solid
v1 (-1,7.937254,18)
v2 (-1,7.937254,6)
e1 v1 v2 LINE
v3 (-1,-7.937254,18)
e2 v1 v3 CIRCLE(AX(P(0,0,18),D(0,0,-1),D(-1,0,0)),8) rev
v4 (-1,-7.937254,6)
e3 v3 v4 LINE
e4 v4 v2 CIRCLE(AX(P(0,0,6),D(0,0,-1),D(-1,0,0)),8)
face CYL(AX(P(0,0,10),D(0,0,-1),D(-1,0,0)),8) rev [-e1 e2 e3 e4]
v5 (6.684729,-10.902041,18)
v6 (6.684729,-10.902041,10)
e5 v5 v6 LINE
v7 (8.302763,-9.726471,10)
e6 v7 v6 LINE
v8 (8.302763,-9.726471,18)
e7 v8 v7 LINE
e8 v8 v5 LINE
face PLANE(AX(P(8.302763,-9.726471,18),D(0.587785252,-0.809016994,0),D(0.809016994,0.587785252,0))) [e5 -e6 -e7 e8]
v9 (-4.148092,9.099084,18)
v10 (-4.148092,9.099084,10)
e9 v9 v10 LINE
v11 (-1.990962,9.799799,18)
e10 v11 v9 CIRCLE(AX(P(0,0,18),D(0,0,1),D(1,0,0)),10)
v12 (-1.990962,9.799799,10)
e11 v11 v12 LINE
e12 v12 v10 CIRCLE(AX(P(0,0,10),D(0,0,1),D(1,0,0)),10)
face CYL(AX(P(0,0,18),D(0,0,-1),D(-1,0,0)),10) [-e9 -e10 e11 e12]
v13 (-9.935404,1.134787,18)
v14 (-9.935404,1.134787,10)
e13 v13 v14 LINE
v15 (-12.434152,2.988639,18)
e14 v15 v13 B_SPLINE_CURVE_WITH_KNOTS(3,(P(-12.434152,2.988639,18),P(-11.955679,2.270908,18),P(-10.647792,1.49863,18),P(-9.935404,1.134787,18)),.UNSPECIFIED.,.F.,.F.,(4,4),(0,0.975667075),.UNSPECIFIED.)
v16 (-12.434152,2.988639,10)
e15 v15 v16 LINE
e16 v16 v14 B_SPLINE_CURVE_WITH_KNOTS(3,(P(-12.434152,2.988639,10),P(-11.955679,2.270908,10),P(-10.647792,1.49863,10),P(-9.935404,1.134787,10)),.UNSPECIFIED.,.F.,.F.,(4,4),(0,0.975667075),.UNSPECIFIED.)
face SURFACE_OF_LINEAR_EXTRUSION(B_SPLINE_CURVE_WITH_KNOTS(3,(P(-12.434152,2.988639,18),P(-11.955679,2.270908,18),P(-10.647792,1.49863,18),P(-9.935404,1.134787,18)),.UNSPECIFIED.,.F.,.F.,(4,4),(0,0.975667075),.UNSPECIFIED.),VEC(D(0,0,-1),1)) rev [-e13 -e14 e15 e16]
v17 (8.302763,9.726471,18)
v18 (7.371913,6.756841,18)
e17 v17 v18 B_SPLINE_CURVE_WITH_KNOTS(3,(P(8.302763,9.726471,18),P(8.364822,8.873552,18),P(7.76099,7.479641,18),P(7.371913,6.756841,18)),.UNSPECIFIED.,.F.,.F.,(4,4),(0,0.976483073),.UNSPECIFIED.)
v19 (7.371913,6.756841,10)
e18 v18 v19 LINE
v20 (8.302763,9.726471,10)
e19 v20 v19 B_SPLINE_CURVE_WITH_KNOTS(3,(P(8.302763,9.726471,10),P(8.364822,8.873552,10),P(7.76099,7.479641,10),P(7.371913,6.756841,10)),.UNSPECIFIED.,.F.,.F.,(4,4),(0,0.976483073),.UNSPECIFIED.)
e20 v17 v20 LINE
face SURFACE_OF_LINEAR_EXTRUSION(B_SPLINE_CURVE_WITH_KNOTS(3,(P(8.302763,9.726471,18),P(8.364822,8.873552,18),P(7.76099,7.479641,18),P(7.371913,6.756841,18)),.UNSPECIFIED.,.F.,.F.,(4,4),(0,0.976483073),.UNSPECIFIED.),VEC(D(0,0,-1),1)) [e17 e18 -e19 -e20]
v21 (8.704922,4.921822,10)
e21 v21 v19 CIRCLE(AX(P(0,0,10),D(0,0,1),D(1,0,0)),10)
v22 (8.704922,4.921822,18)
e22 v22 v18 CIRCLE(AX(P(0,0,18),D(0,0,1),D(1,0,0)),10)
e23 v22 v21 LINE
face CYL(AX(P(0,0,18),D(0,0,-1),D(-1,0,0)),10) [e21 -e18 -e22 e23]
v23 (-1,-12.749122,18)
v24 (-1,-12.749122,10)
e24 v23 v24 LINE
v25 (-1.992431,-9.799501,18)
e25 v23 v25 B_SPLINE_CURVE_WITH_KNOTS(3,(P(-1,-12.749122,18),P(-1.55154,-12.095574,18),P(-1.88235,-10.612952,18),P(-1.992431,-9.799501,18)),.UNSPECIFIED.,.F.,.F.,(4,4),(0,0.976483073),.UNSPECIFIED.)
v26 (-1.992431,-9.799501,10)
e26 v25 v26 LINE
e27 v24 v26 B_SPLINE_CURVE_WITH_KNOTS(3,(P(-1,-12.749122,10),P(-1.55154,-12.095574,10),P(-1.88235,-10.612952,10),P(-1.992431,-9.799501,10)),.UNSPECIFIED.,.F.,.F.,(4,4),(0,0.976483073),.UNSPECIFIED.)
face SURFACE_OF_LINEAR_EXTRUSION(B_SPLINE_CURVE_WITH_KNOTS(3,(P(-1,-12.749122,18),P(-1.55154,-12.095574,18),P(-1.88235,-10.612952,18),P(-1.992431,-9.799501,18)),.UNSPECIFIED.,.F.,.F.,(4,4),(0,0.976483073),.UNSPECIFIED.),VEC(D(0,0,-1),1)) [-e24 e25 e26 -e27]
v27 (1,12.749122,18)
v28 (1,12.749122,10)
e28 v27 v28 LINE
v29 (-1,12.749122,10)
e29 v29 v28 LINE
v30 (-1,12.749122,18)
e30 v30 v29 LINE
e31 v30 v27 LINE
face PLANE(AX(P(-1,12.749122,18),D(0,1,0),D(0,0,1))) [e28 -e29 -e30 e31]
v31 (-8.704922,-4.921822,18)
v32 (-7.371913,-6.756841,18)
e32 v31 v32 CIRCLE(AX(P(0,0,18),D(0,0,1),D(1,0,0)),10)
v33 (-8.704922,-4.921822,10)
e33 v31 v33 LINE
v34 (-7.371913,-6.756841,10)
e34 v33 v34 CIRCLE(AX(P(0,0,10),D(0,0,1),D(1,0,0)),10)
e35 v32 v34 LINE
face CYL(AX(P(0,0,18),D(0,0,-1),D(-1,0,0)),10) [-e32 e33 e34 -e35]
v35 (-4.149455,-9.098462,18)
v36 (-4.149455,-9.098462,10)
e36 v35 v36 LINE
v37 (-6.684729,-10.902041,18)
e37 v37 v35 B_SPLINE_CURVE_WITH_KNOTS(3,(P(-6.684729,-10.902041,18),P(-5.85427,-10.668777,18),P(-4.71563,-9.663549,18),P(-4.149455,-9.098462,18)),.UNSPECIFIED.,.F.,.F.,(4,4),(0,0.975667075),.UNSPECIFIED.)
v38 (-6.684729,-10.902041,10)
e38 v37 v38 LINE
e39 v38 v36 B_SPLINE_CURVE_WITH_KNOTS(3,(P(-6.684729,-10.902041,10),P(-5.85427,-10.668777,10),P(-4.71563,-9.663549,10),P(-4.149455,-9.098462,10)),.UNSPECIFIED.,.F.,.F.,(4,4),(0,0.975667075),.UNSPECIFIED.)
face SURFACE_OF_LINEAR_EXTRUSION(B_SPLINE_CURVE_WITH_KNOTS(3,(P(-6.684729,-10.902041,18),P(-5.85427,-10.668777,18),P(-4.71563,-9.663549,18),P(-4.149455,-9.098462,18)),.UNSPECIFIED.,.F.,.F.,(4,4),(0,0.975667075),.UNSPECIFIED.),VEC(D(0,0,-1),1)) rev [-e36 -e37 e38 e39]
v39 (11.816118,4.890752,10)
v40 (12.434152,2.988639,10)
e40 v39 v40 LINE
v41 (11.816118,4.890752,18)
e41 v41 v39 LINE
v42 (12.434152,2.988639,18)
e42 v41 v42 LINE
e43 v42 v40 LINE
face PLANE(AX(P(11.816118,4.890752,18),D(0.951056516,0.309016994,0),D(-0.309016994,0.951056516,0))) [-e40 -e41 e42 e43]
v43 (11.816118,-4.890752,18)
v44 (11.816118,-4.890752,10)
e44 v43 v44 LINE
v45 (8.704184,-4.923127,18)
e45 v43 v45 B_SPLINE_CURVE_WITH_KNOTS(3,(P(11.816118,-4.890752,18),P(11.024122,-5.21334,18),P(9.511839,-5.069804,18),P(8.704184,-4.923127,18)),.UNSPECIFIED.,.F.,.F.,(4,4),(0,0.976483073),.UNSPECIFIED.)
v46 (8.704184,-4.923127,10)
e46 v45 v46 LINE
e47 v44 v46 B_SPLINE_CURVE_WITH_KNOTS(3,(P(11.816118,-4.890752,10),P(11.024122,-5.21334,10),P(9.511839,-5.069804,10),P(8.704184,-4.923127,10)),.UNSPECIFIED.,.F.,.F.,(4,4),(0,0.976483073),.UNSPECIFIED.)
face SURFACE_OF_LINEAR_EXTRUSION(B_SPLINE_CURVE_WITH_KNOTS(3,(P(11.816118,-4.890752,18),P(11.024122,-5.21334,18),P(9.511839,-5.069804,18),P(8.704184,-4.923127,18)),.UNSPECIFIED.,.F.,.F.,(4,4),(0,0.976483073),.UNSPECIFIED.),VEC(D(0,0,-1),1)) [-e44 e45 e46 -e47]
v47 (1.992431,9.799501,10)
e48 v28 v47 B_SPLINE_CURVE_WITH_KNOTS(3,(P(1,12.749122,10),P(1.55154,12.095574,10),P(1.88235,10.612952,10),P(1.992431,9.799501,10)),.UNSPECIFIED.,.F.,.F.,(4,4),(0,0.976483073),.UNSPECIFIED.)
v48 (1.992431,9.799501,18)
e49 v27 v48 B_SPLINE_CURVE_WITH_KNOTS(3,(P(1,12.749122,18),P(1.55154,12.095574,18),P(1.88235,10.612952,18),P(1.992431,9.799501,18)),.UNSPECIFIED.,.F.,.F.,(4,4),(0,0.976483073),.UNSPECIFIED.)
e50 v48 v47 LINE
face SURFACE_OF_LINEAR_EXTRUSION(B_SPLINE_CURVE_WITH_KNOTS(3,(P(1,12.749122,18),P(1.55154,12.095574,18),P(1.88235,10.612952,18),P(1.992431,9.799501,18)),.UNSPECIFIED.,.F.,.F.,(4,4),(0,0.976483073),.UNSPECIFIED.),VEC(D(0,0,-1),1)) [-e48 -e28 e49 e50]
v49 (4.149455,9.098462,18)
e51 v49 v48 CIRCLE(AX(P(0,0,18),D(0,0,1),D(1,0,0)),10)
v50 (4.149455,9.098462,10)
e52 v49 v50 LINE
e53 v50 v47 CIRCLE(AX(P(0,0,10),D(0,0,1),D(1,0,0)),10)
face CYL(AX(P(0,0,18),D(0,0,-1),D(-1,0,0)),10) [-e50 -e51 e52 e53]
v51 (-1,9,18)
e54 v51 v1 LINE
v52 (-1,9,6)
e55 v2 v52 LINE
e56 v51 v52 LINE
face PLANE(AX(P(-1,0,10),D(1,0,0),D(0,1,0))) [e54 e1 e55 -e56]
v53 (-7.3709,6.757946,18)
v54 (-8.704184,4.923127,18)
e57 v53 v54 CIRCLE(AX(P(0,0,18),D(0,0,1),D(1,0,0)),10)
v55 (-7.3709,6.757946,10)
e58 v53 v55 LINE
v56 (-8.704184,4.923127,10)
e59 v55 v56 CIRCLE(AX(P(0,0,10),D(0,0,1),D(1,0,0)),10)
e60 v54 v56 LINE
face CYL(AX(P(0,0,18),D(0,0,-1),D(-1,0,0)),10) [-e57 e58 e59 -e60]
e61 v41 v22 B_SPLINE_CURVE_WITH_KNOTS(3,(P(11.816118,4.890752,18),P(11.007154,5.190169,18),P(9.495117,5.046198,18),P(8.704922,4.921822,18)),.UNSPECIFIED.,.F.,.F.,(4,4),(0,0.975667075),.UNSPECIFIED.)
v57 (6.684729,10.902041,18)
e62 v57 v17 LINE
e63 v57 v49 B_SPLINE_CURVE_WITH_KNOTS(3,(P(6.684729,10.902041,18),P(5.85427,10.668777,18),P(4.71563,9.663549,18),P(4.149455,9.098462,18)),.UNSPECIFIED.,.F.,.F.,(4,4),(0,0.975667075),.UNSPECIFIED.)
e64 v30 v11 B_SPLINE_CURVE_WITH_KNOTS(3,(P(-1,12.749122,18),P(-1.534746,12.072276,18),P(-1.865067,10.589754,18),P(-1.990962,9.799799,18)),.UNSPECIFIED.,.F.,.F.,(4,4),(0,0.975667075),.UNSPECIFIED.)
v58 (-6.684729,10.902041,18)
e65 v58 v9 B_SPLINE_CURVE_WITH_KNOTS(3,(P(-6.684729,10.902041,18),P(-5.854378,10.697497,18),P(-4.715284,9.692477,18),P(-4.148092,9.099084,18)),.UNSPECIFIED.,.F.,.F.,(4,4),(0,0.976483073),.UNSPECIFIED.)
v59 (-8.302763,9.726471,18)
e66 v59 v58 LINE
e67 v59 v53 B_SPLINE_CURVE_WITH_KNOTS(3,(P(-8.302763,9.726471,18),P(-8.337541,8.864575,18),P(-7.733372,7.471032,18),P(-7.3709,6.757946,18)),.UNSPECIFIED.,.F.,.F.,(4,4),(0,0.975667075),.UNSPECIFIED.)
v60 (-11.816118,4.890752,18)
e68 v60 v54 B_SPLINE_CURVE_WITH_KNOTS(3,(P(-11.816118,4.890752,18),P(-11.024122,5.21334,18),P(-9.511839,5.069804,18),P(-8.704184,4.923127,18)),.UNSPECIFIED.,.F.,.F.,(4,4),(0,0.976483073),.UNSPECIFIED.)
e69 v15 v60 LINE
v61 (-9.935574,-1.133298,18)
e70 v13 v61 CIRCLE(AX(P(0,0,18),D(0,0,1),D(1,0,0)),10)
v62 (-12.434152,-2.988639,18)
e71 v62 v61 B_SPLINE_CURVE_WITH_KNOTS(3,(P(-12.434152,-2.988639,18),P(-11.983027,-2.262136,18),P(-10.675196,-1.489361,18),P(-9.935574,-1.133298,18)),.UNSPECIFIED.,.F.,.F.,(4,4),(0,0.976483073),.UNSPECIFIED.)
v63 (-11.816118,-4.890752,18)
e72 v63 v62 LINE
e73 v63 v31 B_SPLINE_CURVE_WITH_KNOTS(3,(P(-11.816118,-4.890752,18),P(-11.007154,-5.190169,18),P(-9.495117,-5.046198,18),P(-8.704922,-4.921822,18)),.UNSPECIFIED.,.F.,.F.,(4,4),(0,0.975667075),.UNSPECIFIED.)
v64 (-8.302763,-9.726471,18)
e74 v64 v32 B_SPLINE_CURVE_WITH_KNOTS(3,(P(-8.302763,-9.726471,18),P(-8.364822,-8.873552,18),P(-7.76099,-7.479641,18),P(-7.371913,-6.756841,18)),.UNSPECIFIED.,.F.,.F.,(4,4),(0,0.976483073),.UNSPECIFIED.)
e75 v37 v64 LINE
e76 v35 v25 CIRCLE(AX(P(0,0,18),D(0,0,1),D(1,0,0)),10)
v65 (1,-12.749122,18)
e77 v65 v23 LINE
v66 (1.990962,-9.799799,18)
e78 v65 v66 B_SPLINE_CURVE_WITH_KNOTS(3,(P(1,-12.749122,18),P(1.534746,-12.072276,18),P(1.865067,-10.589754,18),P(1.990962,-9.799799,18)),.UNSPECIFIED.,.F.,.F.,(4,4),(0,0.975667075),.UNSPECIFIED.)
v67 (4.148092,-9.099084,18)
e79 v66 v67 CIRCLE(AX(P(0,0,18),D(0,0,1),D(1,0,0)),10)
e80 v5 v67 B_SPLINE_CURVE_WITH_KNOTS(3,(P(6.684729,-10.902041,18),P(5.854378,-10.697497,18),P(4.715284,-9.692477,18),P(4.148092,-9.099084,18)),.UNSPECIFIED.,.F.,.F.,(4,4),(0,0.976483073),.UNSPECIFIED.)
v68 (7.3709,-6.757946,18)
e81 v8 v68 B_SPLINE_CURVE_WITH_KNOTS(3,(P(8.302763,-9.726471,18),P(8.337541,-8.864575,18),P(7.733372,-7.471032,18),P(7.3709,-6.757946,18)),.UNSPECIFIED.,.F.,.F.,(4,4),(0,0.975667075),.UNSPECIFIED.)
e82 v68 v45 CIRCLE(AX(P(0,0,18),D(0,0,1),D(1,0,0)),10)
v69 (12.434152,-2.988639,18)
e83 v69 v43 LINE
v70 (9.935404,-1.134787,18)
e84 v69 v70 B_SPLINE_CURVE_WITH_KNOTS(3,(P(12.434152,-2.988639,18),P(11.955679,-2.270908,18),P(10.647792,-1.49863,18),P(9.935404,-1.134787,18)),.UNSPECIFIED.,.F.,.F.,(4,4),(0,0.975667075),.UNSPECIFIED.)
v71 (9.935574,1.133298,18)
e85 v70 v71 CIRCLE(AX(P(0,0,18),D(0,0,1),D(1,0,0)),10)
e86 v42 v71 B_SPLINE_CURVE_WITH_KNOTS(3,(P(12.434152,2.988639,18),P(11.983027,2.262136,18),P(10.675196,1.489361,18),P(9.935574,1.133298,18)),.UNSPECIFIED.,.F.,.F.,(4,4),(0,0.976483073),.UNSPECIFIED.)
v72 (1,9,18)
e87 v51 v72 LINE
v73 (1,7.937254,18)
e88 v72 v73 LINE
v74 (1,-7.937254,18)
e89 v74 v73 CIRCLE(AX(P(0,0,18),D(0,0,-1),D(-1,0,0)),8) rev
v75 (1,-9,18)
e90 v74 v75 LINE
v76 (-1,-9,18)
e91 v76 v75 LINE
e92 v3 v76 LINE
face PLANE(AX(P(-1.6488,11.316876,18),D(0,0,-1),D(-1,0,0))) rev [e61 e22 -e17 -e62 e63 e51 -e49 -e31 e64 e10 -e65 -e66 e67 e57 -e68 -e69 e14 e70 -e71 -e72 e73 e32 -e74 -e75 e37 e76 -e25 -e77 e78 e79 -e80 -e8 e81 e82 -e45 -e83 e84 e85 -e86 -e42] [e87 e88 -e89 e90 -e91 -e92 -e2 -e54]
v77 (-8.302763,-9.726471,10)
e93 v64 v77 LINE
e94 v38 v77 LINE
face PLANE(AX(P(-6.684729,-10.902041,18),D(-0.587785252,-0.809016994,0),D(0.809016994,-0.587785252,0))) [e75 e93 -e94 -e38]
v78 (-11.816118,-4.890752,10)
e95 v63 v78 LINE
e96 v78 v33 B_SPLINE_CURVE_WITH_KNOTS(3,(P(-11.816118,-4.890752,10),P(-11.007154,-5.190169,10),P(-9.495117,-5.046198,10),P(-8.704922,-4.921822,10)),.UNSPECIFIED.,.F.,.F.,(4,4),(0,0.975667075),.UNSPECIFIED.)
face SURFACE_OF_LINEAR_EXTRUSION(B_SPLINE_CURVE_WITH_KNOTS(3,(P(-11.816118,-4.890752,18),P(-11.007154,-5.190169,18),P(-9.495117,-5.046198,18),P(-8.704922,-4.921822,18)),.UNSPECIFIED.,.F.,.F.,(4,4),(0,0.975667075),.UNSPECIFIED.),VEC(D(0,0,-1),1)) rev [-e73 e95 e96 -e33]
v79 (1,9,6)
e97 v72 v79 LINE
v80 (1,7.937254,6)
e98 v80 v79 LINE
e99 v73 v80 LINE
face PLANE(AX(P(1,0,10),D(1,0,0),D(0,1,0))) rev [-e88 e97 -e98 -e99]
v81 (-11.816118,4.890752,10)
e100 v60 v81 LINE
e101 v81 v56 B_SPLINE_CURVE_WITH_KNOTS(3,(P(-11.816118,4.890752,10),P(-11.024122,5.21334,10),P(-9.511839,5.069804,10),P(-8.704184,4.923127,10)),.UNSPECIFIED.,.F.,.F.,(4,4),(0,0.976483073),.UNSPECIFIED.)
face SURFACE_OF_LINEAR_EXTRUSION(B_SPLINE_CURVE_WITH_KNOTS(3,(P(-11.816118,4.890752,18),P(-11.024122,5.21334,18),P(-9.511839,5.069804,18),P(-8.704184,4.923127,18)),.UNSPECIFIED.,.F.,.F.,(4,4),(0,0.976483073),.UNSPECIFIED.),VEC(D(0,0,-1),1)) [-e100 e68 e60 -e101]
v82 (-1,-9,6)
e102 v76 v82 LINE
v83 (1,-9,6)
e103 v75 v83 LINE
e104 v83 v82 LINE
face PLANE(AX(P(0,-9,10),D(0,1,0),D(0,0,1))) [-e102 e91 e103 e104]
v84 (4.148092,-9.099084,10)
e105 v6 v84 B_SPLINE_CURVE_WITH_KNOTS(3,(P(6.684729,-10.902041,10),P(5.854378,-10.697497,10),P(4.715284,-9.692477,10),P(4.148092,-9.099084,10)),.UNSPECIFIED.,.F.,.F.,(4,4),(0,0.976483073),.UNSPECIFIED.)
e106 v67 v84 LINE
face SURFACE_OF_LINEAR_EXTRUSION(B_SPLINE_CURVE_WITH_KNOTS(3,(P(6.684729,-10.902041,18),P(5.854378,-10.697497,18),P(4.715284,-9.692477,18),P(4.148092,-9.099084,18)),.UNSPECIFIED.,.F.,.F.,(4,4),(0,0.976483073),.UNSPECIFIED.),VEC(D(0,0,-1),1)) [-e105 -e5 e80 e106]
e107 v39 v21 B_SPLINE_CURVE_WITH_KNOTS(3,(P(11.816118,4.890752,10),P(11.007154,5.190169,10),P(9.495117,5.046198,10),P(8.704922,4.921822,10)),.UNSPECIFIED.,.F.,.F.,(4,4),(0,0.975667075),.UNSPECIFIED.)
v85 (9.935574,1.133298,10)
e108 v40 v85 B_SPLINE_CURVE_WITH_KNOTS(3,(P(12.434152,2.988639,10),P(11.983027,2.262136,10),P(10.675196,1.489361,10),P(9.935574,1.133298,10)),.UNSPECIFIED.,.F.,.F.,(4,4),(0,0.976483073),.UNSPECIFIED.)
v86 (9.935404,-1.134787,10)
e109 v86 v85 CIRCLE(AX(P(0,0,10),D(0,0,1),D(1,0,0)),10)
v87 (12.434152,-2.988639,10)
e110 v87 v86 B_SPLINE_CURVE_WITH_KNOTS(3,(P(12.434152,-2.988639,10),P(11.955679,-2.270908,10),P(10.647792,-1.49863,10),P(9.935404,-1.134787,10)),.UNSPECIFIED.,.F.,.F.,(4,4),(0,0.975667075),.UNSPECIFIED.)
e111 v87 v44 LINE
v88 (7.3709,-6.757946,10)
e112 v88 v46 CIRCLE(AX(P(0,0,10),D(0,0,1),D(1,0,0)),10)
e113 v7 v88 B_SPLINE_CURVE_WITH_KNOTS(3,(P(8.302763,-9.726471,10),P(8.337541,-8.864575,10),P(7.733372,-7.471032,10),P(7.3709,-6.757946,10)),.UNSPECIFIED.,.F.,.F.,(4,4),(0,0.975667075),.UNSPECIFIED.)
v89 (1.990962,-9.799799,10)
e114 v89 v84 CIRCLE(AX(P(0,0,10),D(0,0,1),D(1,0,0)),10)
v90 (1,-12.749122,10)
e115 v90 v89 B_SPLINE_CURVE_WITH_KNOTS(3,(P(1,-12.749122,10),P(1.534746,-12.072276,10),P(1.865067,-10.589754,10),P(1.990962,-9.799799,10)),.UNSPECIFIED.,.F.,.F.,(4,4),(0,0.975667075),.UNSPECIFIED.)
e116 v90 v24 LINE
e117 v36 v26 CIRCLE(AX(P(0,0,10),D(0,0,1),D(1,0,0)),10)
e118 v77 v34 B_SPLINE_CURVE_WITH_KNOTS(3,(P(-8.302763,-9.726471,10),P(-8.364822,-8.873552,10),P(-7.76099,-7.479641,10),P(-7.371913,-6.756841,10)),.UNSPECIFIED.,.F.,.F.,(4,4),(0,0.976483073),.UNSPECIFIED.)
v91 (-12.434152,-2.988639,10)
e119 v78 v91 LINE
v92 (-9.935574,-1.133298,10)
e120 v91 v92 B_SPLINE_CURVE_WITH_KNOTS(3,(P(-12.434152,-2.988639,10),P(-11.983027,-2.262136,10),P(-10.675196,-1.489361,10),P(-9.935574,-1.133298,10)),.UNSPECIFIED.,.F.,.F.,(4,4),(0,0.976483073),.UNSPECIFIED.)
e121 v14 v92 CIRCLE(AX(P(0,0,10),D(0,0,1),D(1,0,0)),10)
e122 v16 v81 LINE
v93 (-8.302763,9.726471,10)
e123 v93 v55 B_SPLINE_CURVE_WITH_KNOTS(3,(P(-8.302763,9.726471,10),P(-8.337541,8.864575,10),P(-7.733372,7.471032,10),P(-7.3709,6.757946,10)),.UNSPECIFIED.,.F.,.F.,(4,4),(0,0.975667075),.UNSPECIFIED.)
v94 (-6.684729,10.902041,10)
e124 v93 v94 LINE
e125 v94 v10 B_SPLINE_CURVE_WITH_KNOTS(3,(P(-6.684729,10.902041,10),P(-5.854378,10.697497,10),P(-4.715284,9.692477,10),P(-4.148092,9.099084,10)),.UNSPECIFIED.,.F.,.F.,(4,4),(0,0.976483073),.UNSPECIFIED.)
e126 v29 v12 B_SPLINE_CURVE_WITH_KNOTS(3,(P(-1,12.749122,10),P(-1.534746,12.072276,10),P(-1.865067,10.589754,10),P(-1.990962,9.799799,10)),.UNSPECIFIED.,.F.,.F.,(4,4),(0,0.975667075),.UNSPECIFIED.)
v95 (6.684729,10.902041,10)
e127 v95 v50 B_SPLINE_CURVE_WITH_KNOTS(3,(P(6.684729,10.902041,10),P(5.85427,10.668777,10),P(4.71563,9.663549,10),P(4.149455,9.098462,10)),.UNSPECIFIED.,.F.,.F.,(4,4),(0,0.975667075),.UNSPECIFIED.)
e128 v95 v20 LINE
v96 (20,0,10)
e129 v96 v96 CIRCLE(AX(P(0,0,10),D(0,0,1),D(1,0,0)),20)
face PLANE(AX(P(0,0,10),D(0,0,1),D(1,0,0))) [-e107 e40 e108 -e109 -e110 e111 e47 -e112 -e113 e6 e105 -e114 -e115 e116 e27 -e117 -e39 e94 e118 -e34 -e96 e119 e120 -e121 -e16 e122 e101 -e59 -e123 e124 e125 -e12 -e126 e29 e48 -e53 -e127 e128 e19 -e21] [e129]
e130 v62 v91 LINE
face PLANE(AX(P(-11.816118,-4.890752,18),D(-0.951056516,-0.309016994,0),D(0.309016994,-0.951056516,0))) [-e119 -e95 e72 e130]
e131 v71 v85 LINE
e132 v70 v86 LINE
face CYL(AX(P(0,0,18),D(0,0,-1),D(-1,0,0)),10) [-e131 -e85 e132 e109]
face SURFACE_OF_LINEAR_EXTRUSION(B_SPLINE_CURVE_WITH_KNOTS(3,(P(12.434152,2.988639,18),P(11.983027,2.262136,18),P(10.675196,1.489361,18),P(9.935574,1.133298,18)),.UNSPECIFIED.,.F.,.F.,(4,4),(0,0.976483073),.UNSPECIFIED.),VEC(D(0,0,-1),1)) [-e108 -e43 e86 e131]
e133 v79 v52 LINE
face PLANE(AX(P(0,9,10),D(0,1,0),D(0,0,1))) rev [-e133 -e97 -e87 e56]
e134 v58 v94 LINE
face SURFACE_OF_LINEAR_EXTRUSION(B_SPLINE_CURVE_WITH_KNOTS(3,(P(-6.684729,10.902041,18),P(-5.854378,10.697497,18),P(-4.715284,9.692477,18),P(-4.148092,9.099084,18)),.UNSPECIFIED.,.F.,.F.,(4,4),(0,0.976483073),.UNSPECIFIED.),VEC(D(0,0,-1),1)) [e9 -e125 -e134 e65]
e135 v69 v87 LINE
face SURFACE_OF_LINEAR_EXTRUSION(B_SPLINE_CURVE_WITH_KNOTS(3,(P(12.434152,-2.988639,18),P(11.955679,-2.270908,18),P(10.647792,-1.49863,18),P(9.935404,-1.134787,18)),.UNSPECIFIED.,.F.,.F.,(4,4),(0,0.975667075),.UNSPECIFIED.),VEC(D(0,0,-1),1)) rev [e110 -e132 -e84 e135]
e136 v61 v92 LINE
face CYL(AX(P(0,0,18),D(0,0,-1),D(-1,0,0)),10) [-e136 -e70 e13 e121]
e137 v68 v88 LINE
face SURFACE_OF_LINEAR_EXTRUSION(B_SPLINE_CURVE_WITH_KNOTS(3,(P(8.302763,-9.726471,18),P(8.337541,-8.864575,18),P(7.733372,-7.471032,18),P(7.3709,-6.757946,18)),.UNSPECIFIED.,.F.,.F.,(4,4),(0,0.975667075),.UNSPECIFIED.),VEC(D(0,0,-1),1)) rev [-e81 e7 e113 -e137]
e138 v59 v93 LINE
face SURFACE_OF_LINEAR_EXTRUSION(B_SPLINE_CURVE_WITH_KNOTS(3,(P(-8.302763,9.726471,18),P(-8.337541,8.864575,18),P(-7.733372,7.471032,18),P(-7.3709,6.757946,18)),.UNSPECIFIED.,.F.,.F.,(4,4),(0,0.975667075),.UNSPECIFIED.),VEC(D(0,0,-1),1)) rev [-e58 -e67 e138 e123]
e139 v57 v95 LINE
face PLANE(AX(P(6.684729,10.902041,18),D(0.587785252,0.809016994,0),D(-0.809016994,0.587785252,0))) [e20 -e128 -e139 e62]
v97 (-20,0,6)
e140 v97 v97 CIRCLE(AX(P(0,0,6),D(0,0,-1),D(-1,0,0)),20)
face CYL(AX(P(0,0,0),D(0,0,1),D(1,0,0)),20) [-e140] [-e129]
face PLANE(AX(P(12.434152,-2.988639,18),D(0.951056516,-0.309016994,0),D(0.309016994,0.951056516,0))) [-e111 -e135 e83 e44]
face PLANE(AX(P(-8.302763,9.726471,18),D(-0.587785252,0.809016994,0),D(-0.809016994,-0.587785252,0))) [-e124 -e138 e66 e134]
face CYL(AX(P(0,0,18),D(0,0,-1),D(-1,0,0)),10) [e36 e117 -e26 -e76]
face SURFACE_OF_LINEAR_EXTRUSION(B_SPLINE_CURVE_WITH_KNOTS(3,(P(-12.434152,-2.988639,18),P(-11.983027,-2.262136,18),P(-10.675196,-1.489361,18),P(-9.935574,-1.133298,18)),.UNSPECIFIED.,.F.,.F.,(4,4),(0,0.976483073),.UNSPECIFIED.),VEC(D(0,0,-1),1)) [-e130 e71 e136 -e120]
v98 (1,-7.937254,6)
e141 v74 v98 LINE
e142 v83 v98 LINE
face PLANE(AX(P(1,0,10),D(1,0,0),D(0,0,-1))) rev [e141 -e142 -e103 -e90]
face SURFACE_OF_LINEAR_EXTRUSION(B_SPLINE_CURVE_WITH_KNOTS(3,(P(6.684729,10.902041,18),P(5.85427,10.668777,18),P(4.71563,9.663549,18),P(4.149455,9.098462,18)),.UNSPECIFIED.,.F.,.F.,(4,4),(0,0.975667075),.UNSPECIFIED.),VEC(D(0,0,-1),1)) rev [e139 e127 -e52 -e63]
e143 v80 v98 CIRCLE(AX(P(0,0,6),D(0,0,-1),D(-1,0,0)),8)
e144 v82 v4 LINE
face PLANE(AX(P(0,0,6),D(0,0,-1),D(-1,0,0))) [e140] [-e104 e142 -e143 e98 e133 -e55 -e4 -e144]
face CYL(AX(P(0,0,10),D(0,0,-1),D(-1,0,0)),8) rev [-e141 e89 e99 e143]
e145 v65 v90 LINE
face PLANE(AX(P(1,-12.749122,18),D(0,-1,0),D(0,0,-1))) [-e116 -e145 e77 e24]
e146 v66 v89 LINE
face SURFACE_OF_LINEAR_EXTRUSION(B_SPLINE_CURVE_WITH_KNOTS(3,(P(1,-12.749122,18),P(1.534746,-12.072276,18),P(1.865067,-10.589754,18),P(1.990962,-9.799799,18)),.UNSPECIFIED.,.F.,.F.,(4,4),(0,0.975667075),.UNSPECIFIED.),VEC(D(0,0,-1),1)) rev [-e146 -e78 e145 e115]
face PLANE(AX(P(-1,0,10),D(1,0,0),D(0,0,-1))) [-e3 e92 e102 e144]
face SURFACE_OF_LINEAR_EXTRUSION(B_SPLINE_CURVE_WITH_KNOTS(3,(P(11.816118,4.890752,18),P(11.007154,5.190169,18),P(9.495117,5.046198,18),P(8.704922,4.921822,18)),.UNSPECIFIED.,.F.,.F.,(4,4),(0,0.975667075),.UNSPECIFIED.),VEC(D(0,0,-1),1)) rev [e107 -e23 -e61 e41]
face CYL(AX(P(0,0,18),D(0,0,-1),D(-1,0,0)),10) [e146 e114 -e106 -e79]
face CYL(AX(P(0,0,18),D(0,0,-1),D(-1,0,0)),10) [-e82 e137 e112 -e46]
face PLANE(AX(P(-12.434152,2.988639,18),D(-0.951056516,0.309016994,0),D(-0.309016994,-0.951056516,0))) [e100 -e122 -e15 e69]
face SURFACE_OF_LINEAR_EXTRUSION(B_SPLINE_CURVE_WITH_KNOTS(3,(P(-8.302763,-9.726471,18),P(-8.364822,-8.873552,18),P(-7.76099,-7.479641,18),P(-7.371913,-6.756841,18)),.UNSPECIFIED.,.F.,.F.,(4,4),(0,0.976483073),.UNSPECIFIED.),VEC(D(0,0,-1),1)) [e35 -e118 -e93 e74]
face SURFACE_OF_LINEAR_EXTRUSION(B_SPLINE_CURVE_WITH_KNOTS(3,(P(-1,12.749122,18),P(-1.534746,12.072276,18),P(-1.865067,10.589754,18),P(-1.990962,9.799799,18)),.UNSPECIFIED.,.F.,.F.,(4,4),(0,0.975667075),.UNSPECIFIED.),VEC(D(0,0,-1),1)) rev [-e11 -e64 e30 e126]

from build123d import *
from build123d.topology import SkipClean

# Parameters (mm, degrees)
SKETCH1_R           = 30
BOSS_EXTRUDE1_DEPTH = 10
BOSS_EXTRUDE2_DEPTH = 10
CIRPATTERN1_DEPTH   = 10
BOSS_EXTRUDE4_DEPTH = 8
CIRPATTERN2_COUNT   = 10
SKETCH3_R           = 34.614850266
SKETCH3_R_2         = 20
CUT_EXTRUDE1_DEPTH  = 10
CUT_EXTRUDE2_DEPTH  = 21
CUT_EXTRUDE3_START  = -6
SKETCH4_R           = 20
CUT_EXTRUDE3_DEPTH  = 6


# Read off the part's stored shape, not the designer's step: CirPattern1
with BuildPart() as part:
    # Sketch1 → Boss-Extrude1 (new body)
    with BuildSketch(Plane.XY):
        Circle(SKETCH1_R)
        with BuildLine():
            ThreePointArc((1, -7.937253933), (8, 0), (1, 7.937253933))
            Line((1, 7.937253933), (1, 9))
            Line((1, 9), (-1, 9))
            Line((-1, 9), (-1, 7.937253933))
            ThreePointArc((-1, 7.937253933), (-8, 0), (-1, -7.937253933))
            Line((-1, -7.937253933), (-1, -9))
            Line((-1, -9), (1, -9))
            Line((1, -9), (1, -7.937253933))
        make_face(mode=Mode.SUBTRACT)
    extrude(amount=BOSS_EXTRUDE1_DEPTH)

    # Sketch1<3> → Boss-Extrude2 (add)
    with BuildSketch(Plane.XY):
        with BuildLine():
            ThreePointArc((1.012083684, 33.98493323), (0.506097745, 33.996233101), (-3.37e-07, 34))
            ThreePointArc((-3.37e-07, 34), (-0.505863732, 33.996236584), (-1.011615139, 33.98494718))
            add(Edge.make_bspline(
                [(-1.011615139, 33.98494718), (-1.855460387, 32.888056738), (-2.349185813, 31.525158942), (-2.492791418, 29.896253795)],
                knots=[0.00448065, 0.00448065, 0.00448065, 0.00448065, 0.982900103, 0.982900103, 0.982900103, 0.982900103], degree=3))
            ThreePointArc((-2.492791418, 29.896253795), (0.004835323, 29.99999961), (2.502428492, 29.895448678))
            add(Edge.make_bspline(
                [(1.012083684, 33.98493323), (2.036760796, 32.704388911), (2.533542399, 31.341227394), (2.502428492, 29.895448678)],
                knots=[0.003833031, 0.003833031, 0.003833031, 0.003833031, 0.980908423, 0.980908423, 0.980908423, 0.980908423], degree=3))
        make_face()
    extrude(amount=BOSS_EXTRUDE2_DEPTH)

    # CirPattern1 outline → CirPattern1 (add)
    with BuildSketch(Plane.XY):
        with BuildLine():
            ThreePointArc((9.773545735, 32.564978178), (8.800073923, 32.841417432), (7.818806388, 33.08876345))
            add(Edge.make_bspline(
                [(7.818806388, 33.08876345), (6.719818333, 32.247651865), (5.890172287, 31.058979229), (5.329868249, 29.522745544)],
                knots=[0.00448065, 0.00448065, 0.00448065, 0.00448065, 0.982900103, 0.982900103, 0.982900103, 0.982900103], degree=3))
            ThreePointArc((5.329868249, 29.522745544), (7.769241816, 28.976522939), (10.154671788, 28.229109814))
            add(Edge.make_bspline(
                [(9.773545735, 32.564978178), (10.431878564, 31.062861398), (10.558920581, 29.617571943), (10.154671788, 28.229109814)],
                knots=[0.003833031, 0.003833031, 0.003833031, 0.003833031, 0.980908423, 0.980908423, 0.980908423, 0.980908423], degree=3))
        make_face()
        with BuildLine():
            add(Edge.make_bspline(
                [(-9.773096766, 32.565112922), (-10.304292547, 31.287194894), (-10.428450782, 29.842951172), (-10.145571469, 28.232381755)],
                knots=[0.00448065, 0.00448065, 0.00448065, 0.00448065, 0.982900103, 0.982900103, 0.982900103, 0.982900103], degree=3))
            ThreePointArc((-10.145571469, 28.232381755), (-7.759900689, 28.979025887), (-5.320351171, 29.52446212))
            add(Edge.make_bspline(
                [(-7.818350197, 33.088871244), (-6.497158854, 32.117166366), (-5.664492512, 30.929029992), (-5.320351171, 29.52446212)],
                knots=[0.003833031, 0.003833031, 0.003833031, 0.003833031, 0.980908423, 0.980908423, 0.980908423, 0.980908423], degree=3))
            ThreePointArc((-7.818350197, 33.088871244), (-8.799621143, 32.841538754), (-9.773096766, 32.565112922))
        make_face()
        with BuildLine():
            add(Edge.make_bspline(
                [(-17.868557999, 28.926020034), (-18.050904199, 27.554162422), (-17.797034063, 26.126995596), (-17.106947591, 24.644519555)],
                knots=[0.00448065, 0.00448065, 0.00448065, 0.00448065, 0.982900103, 0.982900103, 0.982900103, 0.982900103], degree=3))
            ThreePointArc((-17.106947591, 24.644519555), (-14.995812293, 25.983179438), (-12.780557694, 27.141432259))
            add(Edge.make_bspline(
                [(-16.115976433, 29.937857365), (-14.588307865, 29.34121201), (-13.476501618, 28.409070308), (-12.780557694, 27.141432259)],
                knots=[0.003833031, 0.003833031, 0.003833031, 0.003833031, 0.980908423, 0.980908423, 0.980908423, 0.980908423], degree=3))
            ThreePointArc((-16.115976433, 29.937857365), (-16.999797024, 29.444980916), (-17.868557999, 28.926020034))
        make_face()
        with BuildLine():
            add(Edge.make_bspline(
                [(-24.746306534, 23.315666684), (-24.567376561, 21.943359317), (-23.952778885, 20.630528448), (-22.902513506, 19.377174075)],
                knots=[0.00448065, 0.00448065, 0.00448065, 0.00448065, 0.982900103, 0.982900103, 0.982900103, 0.982900103], degree=3))
            ThreePointArc((-22.902513506, 19.377174075), (-21.209784071, 21.216622251), (-19.369790332, 22.908758643))
            add(Edge.make_bspline(
                [(-23.315325509, 24.746627981), (-21.685287803, 24.565702544), (-20.37010941, 23.953079431), (-19.369790332, 22.908758643)],
                knots=[0.003833031, 0.003833031, 0.003833031, 0.003833031, 0.980908423, 0.980908423, 0.980908423, 0.980908423], degree=3))
            ThreePointArc((-23.315325509, 24.746627981), (-24.041464831, 24.041796289), (-24.746306534, 23.315666684))
        make_face()
        with BuildLine():
            add(Edge.make_bspline(
                [(-29.937635174, 16.11638918), (-29.409622809, 14.837152538), (-28.476181409, 13.728124879), (-27.137310973, 12.789306203)],
                knots=[0.00448065, 0.00448065, 0.00448065, 0.00448065, 0.982900103, 0.982900103, 0.982900103, 0.982900103], degree=3))
            ThreePointArc((-27.137310973, 12.789306203), (-25.978344116, 15.004187319), (-24.639003768, 17.114890984))
            add(Edge.make_bspline(
                [(-28.925773681, 17.868956796), (-27.304451214, 18.116081046), (-25.875527909, 17.864725776), (-24.639003768, 17.114890984)],
                knots=[0.003833031, 0.003833031, 0.003833031, 0.003833031, 0.980908423, 0.980908423, 0.980908423, 0.980908423], degree=3))
            ThreePointArc((-28.925773681, 17.868956796), (-29.44474654, 17.000202975), (-29.937635174, 16.11638918))
        make_face()
        with BuildLine():
            add(Edge.make_bspline(
                [(-33.08876345, 7.818806388), (-32.247651865, 6.719818333), (-31.058979229, 5.890172287), (-29.522745544, 5.329868249)],
                knots=[0.00448065, 0.00448065, 0.00448065, 0.00448065, 0.982900103, 0.982900103, 0.982900103, 0.982900103], degree=3))
            ThreePointArc((-29.522745544, 5.329868249), (-28.97652294, 7.769241816), (-28.229109815, 10.154671789))
            add(Edge.make_bspline(
                [(-32.564978178, 9.773545735), (-31.062861398, 10.431878564), (-29.617571943, 10.558920581), (-28.229109815, 10.154671789)],
                knots=[0.003833031, 0.003833031, 0.003833031, 0.003833031, 0.980908423, 0.980908423, 0.980908423, 0.980908423], degree=3))
            ThreePointArc((-32.564978178, 9.773545735), (-32.841417432, 8.800073923), (-33.08876345, 7.818806388))
        make_face()
        with BuildLine():
            add(Edge.make_bspline(
                [(-33.98494718, -1.011615139), (-32.888056738, -1.855460387), (-31.525158942, -2.349185813), (-29.896253795, -2.492791418)],
                knots=[0.00448065, 0.00448065, 0.00448065, 0.00448065, 0.982900103, 0.982900103, 0.982900103, 0.982900103], degree=3))
            ThreePointArc((-29.896253795, -2.492791418), (-29.999999612, 0.004835323), (-29.895448679, 2.502428492))
            add(Edge.make_bspline(
                [(-33.98493323, 1.012083684), (-32.704388911, 2.036760796), (-31.341227394, 2.533542399), (-29.895448679, 2.502428492)],
                knots=[0.003833031, 0.003833031, 0.003833031, 0.003833031, 0.980908423, 0.980908423, 0.980908423, 0.980908423], degree=3))
            ThreePointArc((-33.98493323, 1.012083684), (-33.999999999, 0.000234376), (-33.98494718, -1.011615139))
        make_face()
        with BuildLine():
            add(Edge.make_bspline(
                [(-32.565112922, -9.773096766), (-31.287194894, -10.304292547), (-29.842951172, -10.428450782), (-28.232381755, -10.145571469)],
                knots=[0.00448065, 0.00448065, 0.00448065, 0.00448065, 0.982900103, 0.982900103, 0.982900103, 0.982900103], degree=3))
            ThreePointArc((-28.232381755, -10.145571469), (-28.979025887, -7.759900689), (-29.52446212, -5.320351171))
            add(Edge.make_bspline(
                [(-33.088871244, -7.818350197), (-32.117166366, -6.497158854), (-30.929029992, -5.664492512), (-29.52446212, -5.320351171)],
                knots=[0.003833031, 0.003833031, 0.003833031, 0.003833031, 0.980908423, 0.980908423, 0.980908423, 0.980908423], degree=3))
            ThreePointArc((-33.088871244, -7.818350197), (-32.841538754, -8.799621143), (-32.565112922, -9.773096766))
        make_face()
        with BuildLine():
            add(Edge.make_bspline(
                [(-28.926020034, -17.868557999), (-27.554162422, -18.050904199), (-26.126995596, -17.797034063), (-24.644519555, -17.106947591)],
                knots=[0.00448065, 0.00448065, 0.00448065, 0.00448065, 0.982900103, 0.982900103, 0.982900103, 0.982900103], degree=3))
            ThreePointArc((-24.644519555, -17.106947591), (-25.983179438, -14.995812293), (-27.141432259, -12.780557694))
            add(Edge.make_bspline(
                [(-29.937857365, -16.115976433), (-29.34121201, -14.588307865), (-28.409070308, -13.476501618), (-27.141432259, -12.780557694)],
                knots=[0.003833031, 0.003833031, 0.003833031, 0.003833031, 0.980908423, 0.980908423, 0.980908423, 0.980908423], degree=3))
            ThreePointArc((-29.937857365, -16.115976433), (-29.444980916, -16.999797024), (-28.926020034, -17.868557999))
        make_face()
        with BuildLine():
            add(Edge.make_bspline(
                [(-23.315666684, -24.746306534), (-21.943359317, -24.567376561), (-20.630528448, -23.952778885), (-19.377174075, -22.902513506)],
                knots=[0.00448065, 0.00448065, 0.00448065, 0.00448065, 0.982900103, 0.982900103, 0.982900103, 0.982900103], degree=3))
            ThreePointArc((-19.377174075, -22.902513506), (-21.21662225, -21.209784071), (-22.908758643, -19.369790331))
            add(Edge.make_bspline(
                [(-24.746627981, -23.315325509), (-24.565702544, -21.685287803), (-23.953079431, -20.37010941), (-22.908758643, -19.369790331)],
                knots=[0.003833031, 0.003833031, 0.003833031, 0.003833031, 0.980908423, 0.980908423, 0.980908423, 0.980908423], degree=3))
            ThreePointArc((-24.746627981, -23.315325509), (-24.041796289, -24.041464831), (-23.315666684, -24.746306534))
        make_face()
        with BuildLine():
            add(Edge.make_bspline(
                [(-16.11638918, -29.937635174), (-14.837152538, -29.409622809), (-13.728124879, -28.476181409), (-12.789306203, -27.137310973)],
                knots=[0.00448065, 0.00448065, 0.00448065, 0.00448065, 0.982900103, 0.982900103, 0.982900103, 0.982900103], degree=3))
            ThreePointArc((-12.789306203, -27.137310973), (-15.004187318, -25.978344115), (-17.114890984, -24.639003767))
            add(Edge.make_bspline(
                [(-17.868956796, -28.925773681), (-18.116081046, -27.304451214), (-17.864725776, -25.875527909), (-17.114890984, -24.639003767)],
                knots=[0.003833031, 0.003833031, 0.003833031, 0.003833031, 0.980908423, 0.980908423, 0.980908423, 0.980908423], degree=3))
            ThreePointArc((-17.868956796, -28.925773681), (-17.000202975, -29.44474654), (-16.11638918, -29.937635174))
        make_face()
        with BuildLine():
            add(Edge.make_bspline(
                [(-7.818806388, -33.08876345), (-6.719818333, -32.247651865), (-5.890172287, -31.058979229), (-5.329868249, -29.522745544)],
                knots=[0.00448065, 0.00448065, 0.00448065, 0.00448065, 0.982900103, 0.982900103, 0.982900103, 0.982900103], degree=3))
            ThreePointArc((-5.329868249, -29.522745544), (-7.769241816, -28.976522939), (-10.154671788, -28.229109814))
            add(Edge.make_bspline(
                [(-9.773545735, -32.564978178), (-10.431878564, -31.062861398), (-10.558920581, -29.617571943), (-10.154671788, -28.229109814)],
                knots=[0.003833031, 0.003833031, 0.003833031, 0.003833031, 0.980908423, 0.980908423, 0.980908423, 0.980908423], degree=3))
            ThreePointArc((-9.773545735, -32.564978178), (-8.800073923, -32.841417432), (-7.818806388, -33.08876345))
        make_face()
        with BuildLine():
            add(Edge.make_bspline(
                [(1.011615139, -33.98494718), (1.855460387, -32.888056738), (2.349185813, -31.525158942), (2.492791418, -29.896253795)],
                knots=[0.00448065, 0.00448065, 0.00448065, 0.00448065, 0.982900103, 0.982900103, 0.982900103, 0.982900103], degree=3))
            ThreePointArc((2.492791418, -29.896253795), (-0.004835323, -29.99999961), (-2.502428492, -29.895448678))
            add(Edge.make_bspline(
                [(-1.012083684, -33.98493323), (-2.036760796, -32.704388911), (-2.533542399, -31.341227394), (-2.502428492, -29.895448678)],
                knots=[0.003833031, 0.003833031, 0.003833031, 0.003833031, 0.980908423, 0.980908423, 0.980908423, 0.980908423], degree=3))
            ThreePointArc((-1.012083684, -33.98493323), (-0.000234376, -33.999999999), (1.011615139, -33.98494718))
        make_face()
        with BuildLine():
            add(Edge.make_bspline(
                [(9.773096766, -32.565112922), (10.304292547, -31.287194894), (10.428450782, -29.842951172), (10.145571469, -28.232381755)],
                knots=[0.00448065, 0.00448065, 0.00448065, 0.00448065, 0.982900103, 0.982900103, 0.982900103, 0.982900103], degree=3))
            ThreePointArc((10.145571469, -28.232381755), (7.759900689, -28.979025885), (5.320351171, -29.524462118))
            add(Edge.make_bspline(
                [(7.818350197, -33.088871244), (6.497158854, -32.117166366), (5.664492512, -30.929029992), (5.320351171, -29.524462118)],
                knots=[0.003833031, 0.003833031, 0.003833031, 0.003833031, 0.980908423, 0.980908423, 0.980908423, 0.980908423], degree=3))
            ThreePointArc((7.818350197, -33.088871244), (8.799621143, -32.841538754), (9.773096766, -32.565112922))
        make_face()
        with BuildLine():
            add(Edge.make_bspline(
                [(17.868557999, -28.926020034), (18.050904199, -27.554162422), (17.797034063, -26.126995596), (17.106947591, -24.644519555)],
                knots=[0.00448065, 0.00448065, 0.00448065, 0.00448065, 0.982900103, 0.982900103, 0.982900103, 0.982900103], degree=3))
            ThreePointArc((17.106947591, -24.644519555), (14.995812292, -25.983179437), (12.780557694, -27.141432258))
            add(Edge.make_bspline(
                [(16.115976433, -29.937857365), (14.588307865, -29.34121201), (13.476501618, -28.409070308), (12.780557694, -27.141432258)],
                knots=[0.003833031, 0.003833031, 0.003833031, 0.003833031, 0.980908423, 0.980908423, 0.980908423, 0.980908423], degree=3))
            ThreePointArc((16.115976433, -29.937857365), (16.999797024, -29.444980916), (17.868557999, -28.926020034))
        make_face()
        with BuildLine():
            add(Edge.make_bspline(
                [(24.746306534, -23.315666684), (24.567376561, -21.943359317), (23.952778885, -20.630528448), (22.902513506, -19.377174075)],
                knots=[0.00448065, 0.00448065, 0.00448065, 0.00448065, 0.982900103, 0.982900103, 0.982900103, 0.982900103], degree=3))
            ThreePointArc((22.902513506, -19.377174075), (21.209784069, -21.216622249), (19.36979033, -22.908758642))
            add(Edge.make_bspline(
                [(23.315325509, -24.746627981), (21.685287803, -24.565702544), (20.37010941, -23.953079431), (19.36979033, -22.908758642)],
                knots=[0.003833031, 0.003833031, 0.003833031, 0.003833031, 0.980908423, 0.980908423, 0.980908423, 0.980908423], degree=3))
            ThreePointArc((23.315325509, -24.746627981), (24.041464831, -24.041796289), (24.746306534, -23.315666684))
        make_face()
        with BuildLine():
            add(Edge.make_bspline(
                [(29.937635174, -16.11638918), (29.409622809, -14.837152538), (28.476181409, -13.728124879), (27.137310973, -12.789306203)],
                knots=[0.00448065, 0.00448065, 0.00448065, 0.00448065, 0.982900103, 0.982900103, 0.982900103, 0.982900103], degree=3))
            ThreePointArc((27.137310973, -12.789306203), (25.978344113, -15.004187317), (24.639003766, -17.114890983))
            add(Edge.make_bspline(
                [(28.925773681, -17.868956796), (27.304451214, -18.116081046), (25.875527909, -17.864725776), (24.639003766, -17.114890983)],
                knots=[0.003833031, 0.003833031, 0.003833031, 0.003833031, 0.980908423, 0.980908423, 0.980908423, 0.980908423], degree=3))
            ThreePointArc((28.925773681, -17.868956796), (29.44474654, -17.000202975), (29.937635174, -16.11638918))
        make_face()
        with BuildLine():
            add(Edge.make_bspline(
                [(33.08876345, -7.818806388), (32.247651865, -6.719818333), (31.058979229, -5.890172287), (29.522745544, -5.329868249)],
                knots=[0.00448065, 0.00448065, 0.00448065, 0.00448065, 0.982900103, 0.982900103, 0.982900103, 0.982900103], degree=3))
            ThreePointArc((29.522745544, -5.329868249), (28.976522937, -7.769241815), (28.229109813, -10.154671788))
            add(Edge.make_bspline(
                [(32.564978178, -9.773545735), (31.062861398, -10.431878564), (29.617571943, -10.558920581), (28.229109813, -10.154671788)],
                knots=[0.003833031, 0.003833031, 0.003833031, 0.003833031, 0.980908423, 0.980908423, 0.980908423, 0.980908423], degree=3))
            ThreePointArc((32.564978178, -9.773545735), (32.841417432, -8.800073923), (33.08876345, -7.818806388))
        make_face()
        with BuildLine():
            add(Edge.make_bspline(
                [(33.98494718, 1.011615139), (32.888056738, 1.855460387), (31.525158942, 2.349185813), (29.896253795, 2.492791418)],
                knots=[0.00448065, 0.00448065, 0.00448065, 0.00448065, 0.982900103, 0.982900103, 0.982900103, 0.982900103], degree=3))
            ThreePointArc((29.896253795, 2.492791418), (29.999999609, -0.004835323), (29.895448677, -2.502428491))
            add(Edge.make_bspline(
                [(33.98493323, -1.012083684), (32.704388911, -2.036760796), (31.341227394, -2.533542399), (29.895448677, -2.502428491)],
                knots=[0.003833031, 0.003833031, 0.003833031, 0.003833031, 0.980908423, 0.980908423, 0.980908423, 0.980908423], degree=3))
            ThreePointArc((33.98493323, -1.012083684), (33.999999999, -0.000234376), (33.98494718, 1.011615139))
        make_face()
        with BuildLine():
            add(Edge.make_bspline(
                [(32.565112922, 9.773096766), (31.287194894, 10.304292547), (29.842951172, 10.428450782), (28.232381755, 10.145571469)],
                knots=[0.00448065, 0.00448065, 0.00448065, 0.00448065, 0.982900103, 0.982900103, 0.982900103, 0.982900103], degree=3))
            ThreePointArc((28.232381755, 10.145571469), (28.979025885, 7.759900688), (29.524462118, 5.320351171))
            add(Edge.make_bspline(
                [(33.088871244, 7.818350197), (32.117166366, 6.497158854), (30.929029992, 5.664492512), (29.524462118, 5.320351171)],
                knots=[0.003833031, 0.003833031, 0.003833031, 0.003833031, 0.980908423, 0.980908423, 0.980908423, 0.980908423], degree=3))
            ThreePointArc((33.088871244, 7.818350197), (32.841538754, 8.799621143), (32.565112922, 9.773096766))
        make_face()
        with BuildLine():
            add(Edge.make_bspline(
                [(28.926020034, 17.868557999), (27.554162422, 18.050904199), (26.126995596, 17.797034063), (24.644519555, 17.106947591)],
                knots=[0.00448065, 0.00448065, 0.00448065, 0.00448065, 0.982900103, 0.982900103, 0.982900103, 0.982900103], degree=3))
            ThreePointArc((24.644519555, 17.106947591), (25.983179437, 14.995812292), (27.141432257, 12.780557694))
            add(Edge.make_bspline(
                [(29.937857365, 16.115976433), (29.34121201, 14.588307865), (28.409070308, 13.476501618), (27.141432257, 12.780557694)],
                knots=[0.003833031, 0.003833031, 0.003833031, 0.003833031, 0.980908423, 0.980908423, 0.980908423, 0.980908423], degree=3))
            ThreePointArc((29.937857365, 16.115976433), (29.444980916, 16.999797024), (28.926020034, 17.868557999))
        make_face()
        with BuildLine():
            add(Edge.make_bspline(
                [(23.315666684, 24.746306534), (21.943359317, 24.567376561), (20.630528448, 23.952778885), (19.377174075, 22.902513506)],
                knots=[0.00448065, 0.00448065, 0.00448065, 0.00448065, 0.982900103, 0.982900103, 0.982900103, 0.982900103], degree=3))
            ThreePointArc((19.377174075, 22.902513506), (21.216622249, 21.20978407), (22.908758642, 19.36979033))
            add(Edge.make_bspline(
                [(24.746627981, 23.315325509), (24.565702544, 21.685287803), (23.953079431, 20.37010941), (22.908758642, 19.36979033)],
                knots=[0.003833031, 0.003833031, 0.003833031, 0.003833031, 0.980908423, 0.980908423, 0.980908423, 0.980908423], degree=3))
            ThreePointArc((24.746627981, 23.315325509), (24.041796289, 24.041464831), (23.315666684, 24.746306534))
        make_face()
        with BuildLine():
            add(Edge.make_bspline(
                [(16.11638918, 29.937635174), (14.837152538, 29.409622809), (13.728124879, 28.476181409), (12.789306203, 27.137310973)],
                knots=[0.00448065, 0.00448065, 0.00448065, 0.00448065, 0.982900103, 0.982900103, 0.982900103, 0.982900103], degree=3))
            ThreePointArc((12.789306203, 27.137310973), (15.004187318, 25.978344114), (17.114890983, 24.639003766))
            add(Edge.make_bspline(
                [(17.868956796, 28.925773681), (18.116081046, 27.304451214), (17.864725776, 25.875527909), (17.114890983, 24.639003766)],
                knots=[0.003833031, 0.003833031, 0.003833031, 0.003833031, 0.980908423, 0.980908423, 0.980908423, 0.980908423], degree=3))
            ThreePointArc((17.868956796, 28.925773681), (17.000202975, 29.44474654), (16.11638918, 29.937635174))
        make_face()
    extrude(amount=CIRPATTERN1_DEPTH)

    # Sketch2 → Boss-Extrude4 (add)
    with BuildSketch(Plane.XY.offset(10)):
        with BuildLine():
            Line((-1, 12.749121765), (1, 12.749121765))
            add(Edge.make_bspline(
                [(1, 12.749121765), (1.551540037, 12.095573804), (1.882350295, 10.612952368), (1.992430772, 9.799500988)],
                knots=[0, 0, 0, 0, 0.976483073, 0.976483073, 0.976483073, 0.976483073], degree=3))
            ThreePointArc((1.992430772, 9.799500988), (-0.000749367, -9.999999972), (-1.990962066, 9.79979949))
            add(Edge.make_bspline(
                [(-1, 12.749121765), (-1.534746296, 12.072275537), (-1.865066984, 10.589753602), (-1.990962066, 9.79979949)],
                knots=[0, 0, 0, 0, 0.975667075, 0.975667075, 0.975667075, 0.975667075], degree=3))
        make_face()
    boss_extrude4 = extrude(amount=BOSS_EXTRUDE4_DEPTH)

    # CirPattern2: Boss-Extrude4 ×10 about axis
    cirpattern2_axis = Axis((0, 0, 18), (0, 0, -1))
    for i in range(1, CIRPATTERN2_COUNT):
        add(boss_extrude4.rotate(cirpattern2_axis, i * 360 / CIRPATTERN2_COUNT))

    # Sketch3 → Cut-Extrude1 (cut)
    with BuildSketch(Plane.XY.offset(10)):
        Circle(SKETCH3_R)
        Circle(SKETCH3_R_2, mode=Mode.SUBTRACT)
    extrude(amount=-CUT_EXTRUDE1_DEPTH, mode=Mode.SUBTRACT)

    # Sketch1<4> → Cut-Extrude2 (cut)
    with SkipClean():  # the faces are left unmerged after this step: merging them gives an invalid solid
        with BuildSketch(Plane.XY):
            with BuildLine():
                Line((-1, 9), (1, 9))
                Line((1, 9), (1, 7.937253933))
                ThreePointArc((1, 7.937253933), (8, 0), (1, -7.937253933))
                Line((1, -7.937253933), (1, -9))
                Line((1, -9), (-1, -9))
                Line((-1, -9), (-1, -7.937253933))
                ThreePointArc((-1, -7.937253933), (-8, 0), (-1, 7.937253933))
                Line((-1, 7.937253933), (-1, 9))
            make_face()
        extrude(amount=CUT_EXTRUDE2_DEPTH, mode=Mode.SUBTRACT)
    add(part.part.scale(1), mode=Mode.REPLACE)  # the faces are merged on a copy

    # Sketch4 → Cut-Extrude3 (cut)
    with BuildSketch(Plane(origin=(0, 0, 0), x_dir=(-1, 0, 0), z_dir=(0, 0, -1)).offset(CUT_EXTRUDE3_START)):
        with Locations(Location((0, 0, 0), (0, 0, 180))):
            Circle(SKETCH4_R)
    extrude(amount=CUT_EXTRUDE3_DEPTH, mode=Mode.SUBTRACT)


solid = part.part
